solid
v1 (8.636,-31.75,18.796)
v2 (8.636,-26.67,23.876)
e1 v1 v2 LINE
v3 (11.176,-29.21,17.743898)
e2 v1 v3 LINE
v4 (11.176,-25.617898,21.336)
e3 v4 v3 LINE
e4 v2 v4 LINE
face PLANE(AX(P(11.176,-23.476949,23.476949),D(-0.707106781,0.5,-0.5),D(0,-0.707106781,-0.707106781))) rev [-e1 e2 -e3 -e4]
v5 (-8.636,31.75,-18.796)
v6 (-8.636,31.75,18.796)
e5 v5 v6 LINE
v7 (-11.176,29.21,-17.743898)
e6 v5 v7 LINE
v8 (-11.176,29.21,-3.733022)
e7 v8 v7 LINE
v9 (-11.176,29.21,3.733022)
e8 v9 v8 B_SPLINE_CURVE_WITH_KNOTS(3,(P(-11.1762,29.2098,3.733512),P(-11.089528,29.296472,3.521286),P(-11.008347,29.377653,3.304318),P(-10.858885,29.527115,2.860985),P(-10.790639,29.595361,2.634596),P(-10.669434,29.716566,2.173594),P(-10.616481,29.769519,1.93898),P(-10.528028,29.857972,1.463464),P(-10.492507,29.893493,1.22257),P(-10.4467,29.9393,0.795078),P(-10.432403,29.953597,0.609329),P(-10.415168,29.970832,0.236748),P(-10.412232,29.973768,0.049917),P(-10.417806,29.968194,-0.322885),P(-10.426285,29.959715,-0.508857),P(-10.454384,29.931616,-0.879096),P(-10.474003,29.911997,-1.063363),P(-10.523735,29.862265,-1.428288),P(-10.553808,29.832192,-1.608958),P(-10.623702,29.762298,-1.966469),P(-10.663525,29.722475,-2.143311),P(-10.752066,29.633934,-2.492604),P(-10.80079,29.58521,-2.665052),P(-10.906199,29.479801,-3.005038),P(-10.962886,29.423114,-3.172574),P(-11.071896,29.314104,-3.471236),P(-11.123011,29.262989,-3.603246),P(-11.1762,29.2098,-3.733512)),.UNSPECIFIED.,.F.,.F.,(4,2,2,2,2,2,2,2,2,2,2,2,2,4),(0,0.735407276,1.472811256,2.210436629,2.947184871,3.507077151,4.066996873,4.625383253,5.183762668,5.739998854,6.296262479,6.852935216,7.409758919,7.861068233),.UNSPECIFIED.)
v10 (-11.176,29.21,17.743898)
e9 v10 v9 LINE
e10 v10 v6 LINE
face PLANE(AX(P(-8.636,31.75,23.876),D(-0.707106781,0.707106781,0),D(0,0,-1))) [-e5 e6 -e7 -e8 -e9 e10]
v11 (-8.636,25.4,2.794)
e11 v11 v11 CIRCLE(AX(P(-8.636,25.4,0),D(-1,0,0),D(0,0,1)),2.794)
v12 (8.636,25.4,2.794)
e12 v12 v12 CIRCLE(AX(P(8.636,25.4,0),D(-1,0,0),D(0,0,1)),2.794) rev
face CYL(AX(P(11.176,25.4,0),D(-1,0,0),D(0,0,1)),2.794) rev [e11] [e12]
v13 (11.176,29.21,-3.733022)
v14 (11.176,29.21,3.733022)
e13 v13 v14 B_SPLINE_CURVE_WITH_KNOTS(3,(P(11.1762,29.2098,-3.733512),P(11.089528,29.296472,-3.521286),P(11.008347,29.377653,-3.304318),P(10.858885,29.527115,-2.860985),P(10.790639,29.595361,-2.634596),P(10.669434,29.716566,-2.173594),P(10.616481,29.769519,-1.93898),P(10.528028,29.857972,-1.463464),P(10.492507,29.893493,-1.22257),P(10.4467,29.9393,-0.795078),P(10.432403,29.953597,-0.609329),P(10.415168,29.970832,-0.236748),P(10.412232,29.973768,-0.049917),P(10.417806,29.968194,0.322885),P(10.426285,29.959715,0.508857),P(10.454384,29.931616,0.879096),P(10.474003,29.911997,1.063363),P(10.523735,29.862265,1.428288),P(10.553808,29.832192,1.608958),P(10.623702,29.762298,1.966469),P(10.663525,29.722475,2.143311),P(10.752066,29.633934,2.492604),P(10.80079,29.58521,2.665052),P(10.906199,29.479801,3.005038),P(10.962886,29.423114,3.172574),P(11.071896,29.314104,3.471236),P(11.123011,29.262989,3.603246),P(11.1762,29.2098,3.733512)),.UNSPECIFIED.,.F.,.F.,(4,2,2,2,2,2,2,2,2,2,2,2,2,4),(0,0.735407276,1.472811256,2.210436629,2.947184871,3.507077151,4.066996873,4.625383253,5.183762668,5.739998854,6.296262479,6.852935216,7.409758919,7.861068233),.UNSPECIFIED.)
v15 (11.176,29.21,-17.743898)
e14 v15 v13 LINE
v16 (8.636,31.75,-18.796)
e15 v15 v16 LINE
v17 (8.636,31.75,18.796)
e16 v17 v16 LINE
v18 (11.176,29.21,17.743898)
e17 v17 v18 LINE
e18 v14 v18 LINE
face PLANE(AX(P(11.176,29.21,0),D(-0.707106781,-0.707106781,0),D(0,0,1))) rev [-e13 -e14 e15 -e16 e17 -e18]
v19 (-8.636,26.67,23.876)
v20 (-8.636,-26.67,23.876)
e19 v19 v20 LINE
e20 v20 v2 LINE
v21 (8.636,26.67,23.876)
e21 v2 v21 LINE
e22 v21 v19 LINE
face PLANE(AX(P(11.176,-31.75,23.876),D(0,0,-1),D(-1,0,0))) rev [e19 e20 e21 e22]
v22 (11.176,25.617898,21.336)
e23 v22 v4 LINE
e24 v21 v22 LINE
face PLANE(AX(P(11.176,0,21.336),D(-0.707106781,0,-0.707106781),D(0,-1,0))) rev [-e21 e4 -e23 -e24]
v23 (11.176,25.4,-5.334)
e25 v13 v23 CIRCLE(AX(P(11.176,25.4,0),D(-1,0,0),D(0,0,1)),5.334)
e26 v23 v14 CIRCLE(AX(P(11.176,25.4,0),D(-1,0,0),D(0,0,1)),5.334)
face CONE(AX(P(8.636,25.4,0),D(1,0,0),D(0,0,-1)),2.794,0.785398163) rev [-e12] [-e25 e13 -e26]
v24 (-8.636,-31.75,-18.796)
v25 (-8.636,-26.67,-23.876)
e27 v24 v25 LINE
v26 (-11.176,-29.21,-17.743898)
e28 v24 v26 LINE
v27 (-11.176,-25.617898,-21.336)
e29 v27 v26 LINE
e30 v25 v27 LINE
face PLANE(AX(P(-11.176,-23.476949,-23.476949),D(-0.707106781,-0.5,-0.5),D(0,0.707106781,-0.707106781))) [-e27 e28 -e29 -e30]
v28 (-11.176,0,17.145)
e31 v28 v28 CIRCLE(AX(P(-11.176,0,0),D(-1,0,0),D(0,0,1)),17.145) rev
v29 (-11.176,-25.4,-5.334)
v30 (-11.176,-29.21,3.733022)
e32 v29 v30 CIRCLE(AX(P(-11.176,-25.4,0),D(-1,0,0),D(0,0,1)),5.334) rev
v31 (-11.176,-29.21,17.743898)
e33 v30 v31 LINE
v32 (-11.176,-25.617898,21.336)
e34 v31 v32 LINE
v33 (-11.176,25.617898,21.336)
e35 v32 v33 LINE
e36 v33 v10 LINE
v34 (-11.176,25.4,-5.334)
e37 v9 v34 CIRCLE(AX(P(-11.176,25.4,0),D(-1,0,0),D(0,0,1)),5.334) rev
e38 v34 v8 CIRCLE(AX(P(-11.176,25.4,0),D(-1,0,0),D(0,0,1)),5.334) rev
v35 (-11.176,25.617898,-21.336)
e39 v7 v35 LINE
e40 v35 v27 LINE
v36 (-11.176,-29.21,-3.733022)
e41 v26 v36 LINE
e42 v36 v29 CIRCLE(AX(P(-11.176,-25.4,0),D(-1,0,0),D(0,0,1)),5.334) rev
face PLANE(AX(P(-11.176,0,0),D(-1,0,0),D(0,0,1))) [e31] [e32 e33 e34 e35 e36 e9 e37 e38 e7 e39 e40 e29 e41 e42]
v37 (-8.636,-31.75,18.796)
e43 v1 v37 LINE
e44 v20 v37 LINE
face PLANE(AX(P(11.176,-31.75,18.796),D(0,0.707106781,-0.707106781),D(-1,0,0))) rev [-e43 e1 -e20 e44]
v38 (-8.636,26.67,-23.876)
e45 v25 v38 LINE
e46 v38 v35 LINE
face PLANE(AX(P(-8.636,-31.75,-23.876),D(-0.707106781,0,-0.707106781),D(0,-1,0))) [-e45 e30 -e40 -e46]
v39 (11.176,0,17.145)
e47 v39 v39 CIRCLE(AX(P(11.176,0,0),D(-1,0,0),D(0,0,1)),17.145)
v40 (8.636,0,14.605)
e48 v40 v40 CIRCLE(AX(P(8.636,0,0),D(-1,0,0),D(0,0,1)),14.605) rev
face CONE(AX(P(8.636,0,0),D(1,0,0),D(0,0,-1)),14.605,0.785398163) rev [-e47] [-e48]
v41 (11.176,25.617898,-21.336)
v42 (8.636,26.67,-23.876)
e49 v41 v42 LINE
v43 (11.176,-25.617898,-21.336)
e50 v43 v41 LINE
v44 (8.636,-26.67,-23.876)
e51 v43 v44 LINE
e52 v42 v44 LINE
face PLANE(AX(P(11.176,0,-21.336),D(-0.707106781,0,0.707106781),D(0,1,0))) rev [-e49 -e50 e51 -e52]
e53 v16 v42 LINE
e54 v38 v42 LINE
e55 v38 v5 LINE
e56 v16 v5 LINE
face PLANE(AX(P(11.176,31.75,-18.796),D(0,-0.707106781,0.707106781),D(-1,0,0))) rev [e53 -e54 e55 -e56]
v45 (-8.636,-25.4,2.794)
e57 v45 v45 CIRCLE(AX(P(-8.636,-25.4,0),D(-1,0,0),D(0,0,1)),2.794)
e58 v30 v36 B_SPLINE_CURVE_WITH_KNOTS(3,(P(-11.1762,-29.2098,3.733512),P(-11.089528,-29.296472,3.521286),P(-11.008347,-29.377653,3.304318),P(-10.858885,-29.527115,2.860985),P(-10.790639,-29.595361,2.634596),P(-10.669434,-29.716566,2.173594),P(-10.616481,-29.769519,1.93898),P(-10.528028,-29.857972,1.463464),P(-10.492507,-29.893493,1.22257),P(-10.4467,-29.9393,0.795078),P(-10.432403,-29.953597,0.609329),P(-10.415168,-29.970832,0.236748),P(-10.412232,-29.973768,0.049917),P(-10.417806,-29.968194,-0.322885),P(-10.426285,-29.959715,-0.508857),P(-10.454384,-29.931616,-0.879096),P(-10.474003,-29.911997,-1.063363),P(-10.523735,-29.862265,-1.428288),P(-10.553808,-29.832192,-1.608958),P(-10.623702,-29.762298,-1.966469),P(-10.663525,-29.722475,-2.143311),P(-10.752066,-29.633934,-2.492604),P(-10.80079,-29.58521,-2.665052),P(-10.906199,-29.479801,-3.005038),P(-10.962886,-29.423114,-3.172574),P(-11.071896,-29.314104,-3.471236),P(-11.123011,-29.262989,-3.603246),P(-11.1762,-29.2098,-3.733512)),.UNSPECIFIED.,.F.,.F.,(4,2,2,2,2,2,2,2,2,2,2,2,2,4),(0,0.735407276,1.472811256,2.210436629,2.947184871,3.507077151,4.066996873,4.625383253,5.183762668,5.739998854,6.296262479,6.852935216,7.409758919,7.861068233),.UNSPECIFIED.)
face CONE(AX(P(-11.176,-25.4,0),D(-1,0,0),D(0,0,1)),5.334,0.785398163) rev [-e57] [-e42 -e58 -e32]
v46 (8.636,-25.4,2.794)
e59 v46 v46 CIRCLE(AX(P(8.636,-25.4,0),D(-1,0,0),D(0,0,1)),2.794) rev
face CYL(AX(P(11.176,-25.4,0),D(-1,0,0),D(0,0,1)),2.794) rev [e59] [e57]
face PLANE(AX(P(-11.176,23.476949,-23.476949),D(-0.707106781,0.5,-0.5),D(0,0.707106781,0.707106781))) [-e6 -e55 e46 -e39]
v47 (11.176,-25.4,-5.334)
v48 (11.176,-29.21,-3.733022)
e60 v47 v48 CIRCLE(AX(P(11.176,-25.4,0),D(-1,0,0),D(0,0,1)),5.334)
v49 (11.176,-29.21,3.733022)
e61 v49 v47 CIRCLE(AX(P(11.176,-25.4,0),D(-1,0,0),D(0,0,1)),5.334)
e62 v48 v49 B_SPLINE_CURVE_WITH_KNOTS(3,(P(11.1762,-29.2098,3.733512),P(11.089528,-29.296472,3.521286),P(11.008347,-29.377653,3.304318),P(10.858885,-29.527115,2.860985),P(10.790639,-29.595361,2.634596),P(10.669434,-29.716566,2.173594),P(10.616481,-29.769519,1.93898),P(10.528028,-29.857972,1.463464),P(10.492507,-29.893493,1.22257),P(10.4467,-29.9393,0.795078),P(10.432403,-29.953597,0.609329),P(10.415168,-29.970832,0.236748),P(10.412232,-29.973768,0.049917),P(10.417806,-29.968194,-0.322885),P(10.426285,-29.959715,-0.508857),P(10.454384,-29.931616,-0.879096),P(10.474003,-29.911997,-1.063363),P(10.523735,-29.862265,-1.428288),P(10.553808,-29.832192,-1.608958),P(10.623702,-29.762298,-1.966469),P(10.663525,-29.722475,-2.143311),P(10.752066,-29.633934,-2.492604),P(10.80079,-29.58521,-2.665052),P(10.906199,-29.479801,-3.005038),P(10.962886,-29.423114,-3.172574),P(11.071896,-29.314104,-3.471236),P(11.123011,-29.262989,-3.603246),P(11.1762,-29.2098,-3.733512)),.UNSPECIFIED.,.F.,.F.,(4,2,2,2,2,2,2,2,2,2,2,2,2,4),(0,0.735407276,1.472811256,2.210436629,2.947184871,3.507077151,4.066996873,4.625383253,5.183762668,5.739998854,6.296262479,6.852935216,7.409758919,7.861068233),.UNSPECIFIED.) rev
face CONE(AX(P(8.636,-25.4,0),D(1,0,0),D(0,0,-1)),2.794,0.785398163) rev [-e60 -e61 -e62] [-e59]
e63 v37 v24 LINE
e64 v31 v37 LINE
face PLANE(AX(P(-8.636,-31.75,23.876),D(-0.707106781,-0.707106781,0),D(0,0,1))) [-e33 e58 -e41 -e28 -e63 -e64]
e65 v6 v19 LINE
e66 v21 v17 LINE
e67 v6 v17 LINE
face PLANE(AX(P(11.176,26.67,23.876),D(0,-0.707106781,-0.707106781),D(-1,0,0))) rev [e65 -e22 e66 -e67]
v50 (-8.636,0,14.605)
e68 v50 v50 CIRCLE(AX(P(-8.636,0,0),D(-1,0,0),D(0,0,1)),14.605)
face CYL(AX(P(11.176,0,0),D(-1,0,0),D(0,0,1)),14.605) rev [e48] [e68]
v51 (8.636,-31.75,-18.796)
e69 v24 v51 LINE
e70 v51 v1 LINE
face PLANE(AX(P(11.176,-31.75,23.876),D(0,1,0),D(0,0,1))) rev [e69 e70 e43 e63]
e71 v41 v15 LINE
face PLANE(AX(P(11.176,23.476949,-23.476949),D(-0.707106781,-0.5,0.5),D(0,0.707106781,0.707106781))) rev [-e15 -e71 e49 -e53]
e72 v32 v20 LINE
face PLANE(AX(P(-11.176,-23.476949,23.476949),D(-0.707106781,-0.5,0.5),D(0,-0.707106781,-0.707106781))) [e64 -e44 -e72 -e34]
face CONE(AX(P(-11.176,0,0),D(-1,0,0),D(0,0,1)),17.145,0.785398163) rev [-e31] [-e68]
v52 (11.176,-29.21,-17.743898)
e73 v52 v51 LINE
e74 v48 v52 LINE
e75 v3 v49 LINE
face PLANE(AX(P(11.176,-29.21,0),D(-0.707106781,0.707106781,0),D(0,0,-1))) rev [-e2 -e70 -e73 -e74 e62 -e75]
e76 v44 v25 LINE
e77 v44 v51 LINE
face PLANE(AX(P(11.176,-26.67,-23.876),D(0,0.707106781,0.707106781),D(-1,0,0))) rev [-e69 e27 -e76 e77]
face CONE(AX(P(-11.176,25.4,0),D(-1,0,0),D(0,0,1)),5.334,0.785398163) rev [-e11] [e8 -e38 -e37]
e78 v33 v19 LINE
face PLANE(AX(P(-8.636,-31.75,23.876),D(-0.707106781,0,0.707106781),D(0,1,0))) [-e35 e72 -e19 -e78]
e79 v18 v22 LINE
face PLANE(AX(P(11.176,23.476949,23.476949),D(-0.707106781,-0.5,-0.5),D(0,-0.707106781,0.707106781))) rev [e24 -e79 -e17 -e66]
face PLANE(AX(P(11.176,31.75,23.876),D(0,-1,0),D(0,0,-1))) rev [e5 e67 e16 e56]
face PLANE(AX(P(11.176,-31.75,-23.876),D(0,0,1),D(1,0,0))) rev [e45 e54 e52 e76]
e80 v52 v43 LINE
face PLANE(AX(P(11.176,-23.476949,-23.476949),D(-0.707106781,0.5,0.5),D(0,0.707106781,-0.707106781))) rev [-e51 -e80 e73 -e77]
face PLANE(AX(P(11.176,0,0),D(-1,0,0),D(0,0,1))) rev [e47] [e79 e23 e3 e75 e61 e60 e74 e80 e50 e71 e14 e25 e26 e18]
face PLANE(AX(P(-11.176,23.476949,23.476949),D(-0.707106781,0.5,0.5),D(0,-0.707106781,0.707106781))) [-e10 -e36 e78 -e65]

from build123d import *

# Parameters (mm, degrees)
SKETCH1_W           = 47.752
SKETCH1_H           = 63.5
SKETCH1_R           = 14.605
SKETCH1_R_2         = 2.794
BOSS_EXTRUDE1_DEPTH = 11.176
FILLET1_SIZE        = 5.08
CHAMFER1_SIZE       = 2.54


with BuildPart() as part:
    # Sketch1 → Boss-Extrude1 (new, symmetric)
    with BuildSketch(Plane(origin=(0, 0, 0), x_dir=(0, 0, -1), z_dir=(1, 0, 0))):
        Rectangle(SKETCH1_W, SKETCH1_H)
        Circle(SKETCH1_R, mode=Mode.SUBTRACT)
        with Locations((0, -25.4)):
            Circle(SKETCH1_R_2, mode=Mode.SUBTRACT)
        with Locations((0, 25.4)):
            Circle(SKETCH1_R_2, mode=Mode.SUBTRACT)
    extrude(amount=BOSS_EXTRUDE1_DEPTH, both=True)

    # Fillet1
    fillet1_edges = [part.edges().sort_by_distance(p)[0] for p in [
        (0, -31.75, -23.876),
        (0, -31.75, 23.876),
        (0, 31.75, 23.876),
        (0, 31.75, -23.876),
    ]]
    chamfer(fillet1_edges, length=FILLET1_SIZE)

    # Chamfer1
    # the kernel refuses this chamfer: 2.54 mm, written as the material it takes off along each edge
    with BuildSketch(Plane(origin=(-11.176, 0, 0), x_dir=(0, 0, -1), z_dir=(0, -1, 0))) as chamfer1_piece_1:
        Polygon((14.605 + CHAMFER1_SIZE, 0), (14.605, CHAMFER1_SIZE), (14.605, 0), align=None)
    revolve(axis=Axis((-11.176, 0, 0), (1, 0, 0)), mode=Mode.SUBTRACT)
    with BuildSketch(Plane(origin=(11.176, 0, 0), x_dir=(0, 0, -1), z_dir=(0, -1, 0))) as chamfer1_piece_2:
        Polygon((14.605 + CHAMFER1_SIZE, 0), (14.605, -CHAMFER1_SIZE), (14.605, 0), align=None)
    revolve(axis=Axis((11.176, 0, 0), (1, 0, 0)), mode=Mode.SUBTRACT)
    with BuildSketch(Plane(origin=(-11.176, -25.4, 0), x_dir=(0, 0, -1), z_dir=(0, -1, 0))) as chamfer1_piece_3:
        Polygon((2.794 + CHAMFER1_SIZE, 0), (2.794, CHAMFER1_SIZE), (2.794, 0), align=None)
    revolve(axis=Axis((-11.176, -25.4, 0), (1, 0, 0)), mode=Mode.SUBTRACT)
    with BuildSketch(Plane(origin=(11.176, -25.4, 0), x_dir=(0, 0, -1), z_dir=(0, -1, 0))) as chamfer1_piece_4:
        Polygon((2.794 + CHAMFER1_SIZE, 0), (2.794, -CHAMFER1_SIZE), (2.794, 0), align=None)
    revolve(axis=Axis((11.176, -25.4, 0), (1, 0, 0)), mode=Mode.SUBTRACT)
    with BuildSketch(Plane(origin=(-11.176, 25.4, 0), x_dir=(0, 0, -1), z_dir=(0, -1, 0))) as chamfer1_piece_5:
        Polygon((2.794 + CHAMFER1_SIZE, 0), (2.794, CHAMFER1_SIZE), (2.794, 0), align=None)
    revolve(axis=Axis((-11.176, 25.4, 0), (1, 0, 0)), mode=Mode.SUBTRACT)
    with BuildSketch(Plane(origin=(11.176, 25.4, 0), x_dir=(0, 0, -1), z_dir=(0, -1, 0))) as chamfer1_piece_6:
        Polygon((2.794 + CHAMFER1_SIZE, 0), (2.794, -CHAMFER1_SIZE), (2.794, 0), align=None)
    revolve(axis=Axis((11.176, 25.4, 0), (1, 0, 0)), mode=Mode.SUBTRACT)
    with BuildSketch(Plane(origin=(-11.176, 31.75, -25.328074789), x_dir=(-0.02749587661058663, -0.9996219169112968, 0), z_dir=(0, 0, 1)), Plane(origin=(11.176, -31.75, 25.328074789), x_dir=(-0.9996219169112968, -0.02749587661058591, 0), z_dir=(0, 0, -1))) as chamfer1_piece_7:
        Polygon((CHAMFER1_SIZE * 0.999621916911, CHAMFER1_SIZE * 0.0274958766106), (-CHAMFER1_SIZE * 0.0274958766106, CHAMFER1_SIZE * 0.999621916911), (0, 0), align=None)
    extrude(amount=50.656149579, mode=Mode.SUBTRACT)
    with BuildSketch(Plane(origin=(11.176, 31.75, -25.328074789), x_dir=(0.02749587661058663, -0.9996219169112968, 0), z_dir=(0, 0, 1)), Plane(origin=(-11.176, -31.75, 25.328074789), x_dir=(0.9996219169112968, -0.02749587661058591, 0), z_dir=(0, 0, -1))) as chamfer1_piece_8:
        Polygon((CHAMFER1_SIZE * 0.999621916911, -CHAMFER1_SIZE * 0.0274958766106), (-CHAMFER1_SIZE * 0.0274958766106, -CHAMFER1_SIZE * 0.999621916911), (0, 0), align=None)
    extrude(amount=50.656149579, mode=Mode.SUBTRACT)
    with BuildSketch(Plane(origin=(-11.176, -33.202074789, -23.876), x_dir=(-0.02749587661058663, 0, 0.9996219169112968), z_dir=(0, 1, 0)), Plane(origin=(-11.176, 33.202074789, 23.876), x_dir=(-0.02749587661058663, 0, -0.9996219169112968), z_dir=(0, -1, 0))) as chamfer1_piece_9:
        Polygon((CHAMFER1_SIZE * 0.999621916911, CHAMFER1_SIZE * 0.0274958766106), (-CHAMFER1_SIZE * 0.0274958766106, CHAMFER1_SIZE * 0.999621916911), (0, 0), align=None)
    extrude(amount=66.404149579, mode=Mode.SUBTRACT)
    with BuildSketch(Plane(origin=(-11.176, -36.368874379, -14.177125621), x_dir=(-0.027495876610586566, 0.7068394360706737, 0.7068394360706733), z_dir=(0, 0.7071067811865474, -0.7071067811865477)), Plane(origin=(11.176, -36.368874379, -14.177125621), x_dir=(-0.9996219169112966, -0.019442520806015103, -0.019442520806015093), z_dir=(0, 0.7071067811865474, -0.7071067811865477)), Plane(origin=(11.176, 22.051125621, 28.494874379), x_dir=(0.027495876610586632, -0.7068394360706737, -0.7068394360706733), z_dir=(0, 0.7071067811865474, -0.7071067811865477)), Plane(origin=(11.176, 36.368874379, -14.177125621), x_dir=(0.027495876610586566, -0.7068394360706737, 0.7068394360706733), z_dir=(0, -0.7071067811865474, -0.7071067811865477))) as chamfer1_piece_10:
        Polygon((CHAMFER1_SIZE * 0.999621916911, CHAMFER1_SIZE * 0.0274958766106), (-CHAMFER1_SIZE * 0.0274958766106, CHAMFER1_SIZE * 0.999621916911), (0, 0), align=None)
    extrude(amount=20.248354476, mode=Mode.SUBTRACT)
    with BuildSketch(Plane(origin=(-11.176, -36.368874379, 14.177125621), x_dir=(-0.027495876610586566, 0.7068394360706737, -0.7068394360706733), z_dir=(0, 0.7071067811865474, 0.7071067811865477)), Plane(origin=(-11.176, 22.051125621, 28.494874379), x_dir=(-0.027495876610586632, -0.7068394360706737, -0.7068394360706733), z_dir=(0, 0.7071067811865474, -0.7071067811865477)), Plane(origin=(-11.176, 36.368874379, -14.177125621), x_dir=(-0.027495876610586566, -0.7068394360706737, 0.7068394360706733), z_dir=(0, -0.7071067811865474, -0.7071067811865477)), Plane(origin=(11.176, -36.368874379, 14.177125621), x_dir=(-0.9996219169112966, -0.019442520806015457, 0.019442520806015447), z_dir=(0, 0.7071067811865474, 0.7071067811865477))) as chamfer1_piece_11:
        Polygon((CHAMFER1_SIZE * 0.999621916911, -CHAMFER1_SIZE * 0.0274958766106), (-CHAMFER1_SIZE * 0.0274958766106, -CHAMFER1_SIZE * 0.999621916911), (0, 0), align=None)
    extrude(amount=20.248354476, mode=Mode.SUBTRACT)
    with BuildSketch(Plane(origin=(11.176, -33.202074789, -23.876), x_dir=(0.02749587661058663, 0, 0.9996219169112968), z_dir=(0, 1, 0)), Plane(origin=(11.176, 33.202074789, 23.876), x_dir=(0.02749587661058663, 0, -0.9996219169112968), z_dir=(0, -1, 0))) as chamfer1_piece_12:
        Polygon((CHAMFER1_SIZE * 0.999621916911, -CHAMFER1_SIZE * 0.0274958766106), (-CHAMFER1_SIZE * 0.0274958766106, -CHAMFER1_SIZE * 0.999621916911), (0, 0), align=None)
    extrude(amount=66.404149579, mode=Mode.SUBTRACT)


solid = part.part
